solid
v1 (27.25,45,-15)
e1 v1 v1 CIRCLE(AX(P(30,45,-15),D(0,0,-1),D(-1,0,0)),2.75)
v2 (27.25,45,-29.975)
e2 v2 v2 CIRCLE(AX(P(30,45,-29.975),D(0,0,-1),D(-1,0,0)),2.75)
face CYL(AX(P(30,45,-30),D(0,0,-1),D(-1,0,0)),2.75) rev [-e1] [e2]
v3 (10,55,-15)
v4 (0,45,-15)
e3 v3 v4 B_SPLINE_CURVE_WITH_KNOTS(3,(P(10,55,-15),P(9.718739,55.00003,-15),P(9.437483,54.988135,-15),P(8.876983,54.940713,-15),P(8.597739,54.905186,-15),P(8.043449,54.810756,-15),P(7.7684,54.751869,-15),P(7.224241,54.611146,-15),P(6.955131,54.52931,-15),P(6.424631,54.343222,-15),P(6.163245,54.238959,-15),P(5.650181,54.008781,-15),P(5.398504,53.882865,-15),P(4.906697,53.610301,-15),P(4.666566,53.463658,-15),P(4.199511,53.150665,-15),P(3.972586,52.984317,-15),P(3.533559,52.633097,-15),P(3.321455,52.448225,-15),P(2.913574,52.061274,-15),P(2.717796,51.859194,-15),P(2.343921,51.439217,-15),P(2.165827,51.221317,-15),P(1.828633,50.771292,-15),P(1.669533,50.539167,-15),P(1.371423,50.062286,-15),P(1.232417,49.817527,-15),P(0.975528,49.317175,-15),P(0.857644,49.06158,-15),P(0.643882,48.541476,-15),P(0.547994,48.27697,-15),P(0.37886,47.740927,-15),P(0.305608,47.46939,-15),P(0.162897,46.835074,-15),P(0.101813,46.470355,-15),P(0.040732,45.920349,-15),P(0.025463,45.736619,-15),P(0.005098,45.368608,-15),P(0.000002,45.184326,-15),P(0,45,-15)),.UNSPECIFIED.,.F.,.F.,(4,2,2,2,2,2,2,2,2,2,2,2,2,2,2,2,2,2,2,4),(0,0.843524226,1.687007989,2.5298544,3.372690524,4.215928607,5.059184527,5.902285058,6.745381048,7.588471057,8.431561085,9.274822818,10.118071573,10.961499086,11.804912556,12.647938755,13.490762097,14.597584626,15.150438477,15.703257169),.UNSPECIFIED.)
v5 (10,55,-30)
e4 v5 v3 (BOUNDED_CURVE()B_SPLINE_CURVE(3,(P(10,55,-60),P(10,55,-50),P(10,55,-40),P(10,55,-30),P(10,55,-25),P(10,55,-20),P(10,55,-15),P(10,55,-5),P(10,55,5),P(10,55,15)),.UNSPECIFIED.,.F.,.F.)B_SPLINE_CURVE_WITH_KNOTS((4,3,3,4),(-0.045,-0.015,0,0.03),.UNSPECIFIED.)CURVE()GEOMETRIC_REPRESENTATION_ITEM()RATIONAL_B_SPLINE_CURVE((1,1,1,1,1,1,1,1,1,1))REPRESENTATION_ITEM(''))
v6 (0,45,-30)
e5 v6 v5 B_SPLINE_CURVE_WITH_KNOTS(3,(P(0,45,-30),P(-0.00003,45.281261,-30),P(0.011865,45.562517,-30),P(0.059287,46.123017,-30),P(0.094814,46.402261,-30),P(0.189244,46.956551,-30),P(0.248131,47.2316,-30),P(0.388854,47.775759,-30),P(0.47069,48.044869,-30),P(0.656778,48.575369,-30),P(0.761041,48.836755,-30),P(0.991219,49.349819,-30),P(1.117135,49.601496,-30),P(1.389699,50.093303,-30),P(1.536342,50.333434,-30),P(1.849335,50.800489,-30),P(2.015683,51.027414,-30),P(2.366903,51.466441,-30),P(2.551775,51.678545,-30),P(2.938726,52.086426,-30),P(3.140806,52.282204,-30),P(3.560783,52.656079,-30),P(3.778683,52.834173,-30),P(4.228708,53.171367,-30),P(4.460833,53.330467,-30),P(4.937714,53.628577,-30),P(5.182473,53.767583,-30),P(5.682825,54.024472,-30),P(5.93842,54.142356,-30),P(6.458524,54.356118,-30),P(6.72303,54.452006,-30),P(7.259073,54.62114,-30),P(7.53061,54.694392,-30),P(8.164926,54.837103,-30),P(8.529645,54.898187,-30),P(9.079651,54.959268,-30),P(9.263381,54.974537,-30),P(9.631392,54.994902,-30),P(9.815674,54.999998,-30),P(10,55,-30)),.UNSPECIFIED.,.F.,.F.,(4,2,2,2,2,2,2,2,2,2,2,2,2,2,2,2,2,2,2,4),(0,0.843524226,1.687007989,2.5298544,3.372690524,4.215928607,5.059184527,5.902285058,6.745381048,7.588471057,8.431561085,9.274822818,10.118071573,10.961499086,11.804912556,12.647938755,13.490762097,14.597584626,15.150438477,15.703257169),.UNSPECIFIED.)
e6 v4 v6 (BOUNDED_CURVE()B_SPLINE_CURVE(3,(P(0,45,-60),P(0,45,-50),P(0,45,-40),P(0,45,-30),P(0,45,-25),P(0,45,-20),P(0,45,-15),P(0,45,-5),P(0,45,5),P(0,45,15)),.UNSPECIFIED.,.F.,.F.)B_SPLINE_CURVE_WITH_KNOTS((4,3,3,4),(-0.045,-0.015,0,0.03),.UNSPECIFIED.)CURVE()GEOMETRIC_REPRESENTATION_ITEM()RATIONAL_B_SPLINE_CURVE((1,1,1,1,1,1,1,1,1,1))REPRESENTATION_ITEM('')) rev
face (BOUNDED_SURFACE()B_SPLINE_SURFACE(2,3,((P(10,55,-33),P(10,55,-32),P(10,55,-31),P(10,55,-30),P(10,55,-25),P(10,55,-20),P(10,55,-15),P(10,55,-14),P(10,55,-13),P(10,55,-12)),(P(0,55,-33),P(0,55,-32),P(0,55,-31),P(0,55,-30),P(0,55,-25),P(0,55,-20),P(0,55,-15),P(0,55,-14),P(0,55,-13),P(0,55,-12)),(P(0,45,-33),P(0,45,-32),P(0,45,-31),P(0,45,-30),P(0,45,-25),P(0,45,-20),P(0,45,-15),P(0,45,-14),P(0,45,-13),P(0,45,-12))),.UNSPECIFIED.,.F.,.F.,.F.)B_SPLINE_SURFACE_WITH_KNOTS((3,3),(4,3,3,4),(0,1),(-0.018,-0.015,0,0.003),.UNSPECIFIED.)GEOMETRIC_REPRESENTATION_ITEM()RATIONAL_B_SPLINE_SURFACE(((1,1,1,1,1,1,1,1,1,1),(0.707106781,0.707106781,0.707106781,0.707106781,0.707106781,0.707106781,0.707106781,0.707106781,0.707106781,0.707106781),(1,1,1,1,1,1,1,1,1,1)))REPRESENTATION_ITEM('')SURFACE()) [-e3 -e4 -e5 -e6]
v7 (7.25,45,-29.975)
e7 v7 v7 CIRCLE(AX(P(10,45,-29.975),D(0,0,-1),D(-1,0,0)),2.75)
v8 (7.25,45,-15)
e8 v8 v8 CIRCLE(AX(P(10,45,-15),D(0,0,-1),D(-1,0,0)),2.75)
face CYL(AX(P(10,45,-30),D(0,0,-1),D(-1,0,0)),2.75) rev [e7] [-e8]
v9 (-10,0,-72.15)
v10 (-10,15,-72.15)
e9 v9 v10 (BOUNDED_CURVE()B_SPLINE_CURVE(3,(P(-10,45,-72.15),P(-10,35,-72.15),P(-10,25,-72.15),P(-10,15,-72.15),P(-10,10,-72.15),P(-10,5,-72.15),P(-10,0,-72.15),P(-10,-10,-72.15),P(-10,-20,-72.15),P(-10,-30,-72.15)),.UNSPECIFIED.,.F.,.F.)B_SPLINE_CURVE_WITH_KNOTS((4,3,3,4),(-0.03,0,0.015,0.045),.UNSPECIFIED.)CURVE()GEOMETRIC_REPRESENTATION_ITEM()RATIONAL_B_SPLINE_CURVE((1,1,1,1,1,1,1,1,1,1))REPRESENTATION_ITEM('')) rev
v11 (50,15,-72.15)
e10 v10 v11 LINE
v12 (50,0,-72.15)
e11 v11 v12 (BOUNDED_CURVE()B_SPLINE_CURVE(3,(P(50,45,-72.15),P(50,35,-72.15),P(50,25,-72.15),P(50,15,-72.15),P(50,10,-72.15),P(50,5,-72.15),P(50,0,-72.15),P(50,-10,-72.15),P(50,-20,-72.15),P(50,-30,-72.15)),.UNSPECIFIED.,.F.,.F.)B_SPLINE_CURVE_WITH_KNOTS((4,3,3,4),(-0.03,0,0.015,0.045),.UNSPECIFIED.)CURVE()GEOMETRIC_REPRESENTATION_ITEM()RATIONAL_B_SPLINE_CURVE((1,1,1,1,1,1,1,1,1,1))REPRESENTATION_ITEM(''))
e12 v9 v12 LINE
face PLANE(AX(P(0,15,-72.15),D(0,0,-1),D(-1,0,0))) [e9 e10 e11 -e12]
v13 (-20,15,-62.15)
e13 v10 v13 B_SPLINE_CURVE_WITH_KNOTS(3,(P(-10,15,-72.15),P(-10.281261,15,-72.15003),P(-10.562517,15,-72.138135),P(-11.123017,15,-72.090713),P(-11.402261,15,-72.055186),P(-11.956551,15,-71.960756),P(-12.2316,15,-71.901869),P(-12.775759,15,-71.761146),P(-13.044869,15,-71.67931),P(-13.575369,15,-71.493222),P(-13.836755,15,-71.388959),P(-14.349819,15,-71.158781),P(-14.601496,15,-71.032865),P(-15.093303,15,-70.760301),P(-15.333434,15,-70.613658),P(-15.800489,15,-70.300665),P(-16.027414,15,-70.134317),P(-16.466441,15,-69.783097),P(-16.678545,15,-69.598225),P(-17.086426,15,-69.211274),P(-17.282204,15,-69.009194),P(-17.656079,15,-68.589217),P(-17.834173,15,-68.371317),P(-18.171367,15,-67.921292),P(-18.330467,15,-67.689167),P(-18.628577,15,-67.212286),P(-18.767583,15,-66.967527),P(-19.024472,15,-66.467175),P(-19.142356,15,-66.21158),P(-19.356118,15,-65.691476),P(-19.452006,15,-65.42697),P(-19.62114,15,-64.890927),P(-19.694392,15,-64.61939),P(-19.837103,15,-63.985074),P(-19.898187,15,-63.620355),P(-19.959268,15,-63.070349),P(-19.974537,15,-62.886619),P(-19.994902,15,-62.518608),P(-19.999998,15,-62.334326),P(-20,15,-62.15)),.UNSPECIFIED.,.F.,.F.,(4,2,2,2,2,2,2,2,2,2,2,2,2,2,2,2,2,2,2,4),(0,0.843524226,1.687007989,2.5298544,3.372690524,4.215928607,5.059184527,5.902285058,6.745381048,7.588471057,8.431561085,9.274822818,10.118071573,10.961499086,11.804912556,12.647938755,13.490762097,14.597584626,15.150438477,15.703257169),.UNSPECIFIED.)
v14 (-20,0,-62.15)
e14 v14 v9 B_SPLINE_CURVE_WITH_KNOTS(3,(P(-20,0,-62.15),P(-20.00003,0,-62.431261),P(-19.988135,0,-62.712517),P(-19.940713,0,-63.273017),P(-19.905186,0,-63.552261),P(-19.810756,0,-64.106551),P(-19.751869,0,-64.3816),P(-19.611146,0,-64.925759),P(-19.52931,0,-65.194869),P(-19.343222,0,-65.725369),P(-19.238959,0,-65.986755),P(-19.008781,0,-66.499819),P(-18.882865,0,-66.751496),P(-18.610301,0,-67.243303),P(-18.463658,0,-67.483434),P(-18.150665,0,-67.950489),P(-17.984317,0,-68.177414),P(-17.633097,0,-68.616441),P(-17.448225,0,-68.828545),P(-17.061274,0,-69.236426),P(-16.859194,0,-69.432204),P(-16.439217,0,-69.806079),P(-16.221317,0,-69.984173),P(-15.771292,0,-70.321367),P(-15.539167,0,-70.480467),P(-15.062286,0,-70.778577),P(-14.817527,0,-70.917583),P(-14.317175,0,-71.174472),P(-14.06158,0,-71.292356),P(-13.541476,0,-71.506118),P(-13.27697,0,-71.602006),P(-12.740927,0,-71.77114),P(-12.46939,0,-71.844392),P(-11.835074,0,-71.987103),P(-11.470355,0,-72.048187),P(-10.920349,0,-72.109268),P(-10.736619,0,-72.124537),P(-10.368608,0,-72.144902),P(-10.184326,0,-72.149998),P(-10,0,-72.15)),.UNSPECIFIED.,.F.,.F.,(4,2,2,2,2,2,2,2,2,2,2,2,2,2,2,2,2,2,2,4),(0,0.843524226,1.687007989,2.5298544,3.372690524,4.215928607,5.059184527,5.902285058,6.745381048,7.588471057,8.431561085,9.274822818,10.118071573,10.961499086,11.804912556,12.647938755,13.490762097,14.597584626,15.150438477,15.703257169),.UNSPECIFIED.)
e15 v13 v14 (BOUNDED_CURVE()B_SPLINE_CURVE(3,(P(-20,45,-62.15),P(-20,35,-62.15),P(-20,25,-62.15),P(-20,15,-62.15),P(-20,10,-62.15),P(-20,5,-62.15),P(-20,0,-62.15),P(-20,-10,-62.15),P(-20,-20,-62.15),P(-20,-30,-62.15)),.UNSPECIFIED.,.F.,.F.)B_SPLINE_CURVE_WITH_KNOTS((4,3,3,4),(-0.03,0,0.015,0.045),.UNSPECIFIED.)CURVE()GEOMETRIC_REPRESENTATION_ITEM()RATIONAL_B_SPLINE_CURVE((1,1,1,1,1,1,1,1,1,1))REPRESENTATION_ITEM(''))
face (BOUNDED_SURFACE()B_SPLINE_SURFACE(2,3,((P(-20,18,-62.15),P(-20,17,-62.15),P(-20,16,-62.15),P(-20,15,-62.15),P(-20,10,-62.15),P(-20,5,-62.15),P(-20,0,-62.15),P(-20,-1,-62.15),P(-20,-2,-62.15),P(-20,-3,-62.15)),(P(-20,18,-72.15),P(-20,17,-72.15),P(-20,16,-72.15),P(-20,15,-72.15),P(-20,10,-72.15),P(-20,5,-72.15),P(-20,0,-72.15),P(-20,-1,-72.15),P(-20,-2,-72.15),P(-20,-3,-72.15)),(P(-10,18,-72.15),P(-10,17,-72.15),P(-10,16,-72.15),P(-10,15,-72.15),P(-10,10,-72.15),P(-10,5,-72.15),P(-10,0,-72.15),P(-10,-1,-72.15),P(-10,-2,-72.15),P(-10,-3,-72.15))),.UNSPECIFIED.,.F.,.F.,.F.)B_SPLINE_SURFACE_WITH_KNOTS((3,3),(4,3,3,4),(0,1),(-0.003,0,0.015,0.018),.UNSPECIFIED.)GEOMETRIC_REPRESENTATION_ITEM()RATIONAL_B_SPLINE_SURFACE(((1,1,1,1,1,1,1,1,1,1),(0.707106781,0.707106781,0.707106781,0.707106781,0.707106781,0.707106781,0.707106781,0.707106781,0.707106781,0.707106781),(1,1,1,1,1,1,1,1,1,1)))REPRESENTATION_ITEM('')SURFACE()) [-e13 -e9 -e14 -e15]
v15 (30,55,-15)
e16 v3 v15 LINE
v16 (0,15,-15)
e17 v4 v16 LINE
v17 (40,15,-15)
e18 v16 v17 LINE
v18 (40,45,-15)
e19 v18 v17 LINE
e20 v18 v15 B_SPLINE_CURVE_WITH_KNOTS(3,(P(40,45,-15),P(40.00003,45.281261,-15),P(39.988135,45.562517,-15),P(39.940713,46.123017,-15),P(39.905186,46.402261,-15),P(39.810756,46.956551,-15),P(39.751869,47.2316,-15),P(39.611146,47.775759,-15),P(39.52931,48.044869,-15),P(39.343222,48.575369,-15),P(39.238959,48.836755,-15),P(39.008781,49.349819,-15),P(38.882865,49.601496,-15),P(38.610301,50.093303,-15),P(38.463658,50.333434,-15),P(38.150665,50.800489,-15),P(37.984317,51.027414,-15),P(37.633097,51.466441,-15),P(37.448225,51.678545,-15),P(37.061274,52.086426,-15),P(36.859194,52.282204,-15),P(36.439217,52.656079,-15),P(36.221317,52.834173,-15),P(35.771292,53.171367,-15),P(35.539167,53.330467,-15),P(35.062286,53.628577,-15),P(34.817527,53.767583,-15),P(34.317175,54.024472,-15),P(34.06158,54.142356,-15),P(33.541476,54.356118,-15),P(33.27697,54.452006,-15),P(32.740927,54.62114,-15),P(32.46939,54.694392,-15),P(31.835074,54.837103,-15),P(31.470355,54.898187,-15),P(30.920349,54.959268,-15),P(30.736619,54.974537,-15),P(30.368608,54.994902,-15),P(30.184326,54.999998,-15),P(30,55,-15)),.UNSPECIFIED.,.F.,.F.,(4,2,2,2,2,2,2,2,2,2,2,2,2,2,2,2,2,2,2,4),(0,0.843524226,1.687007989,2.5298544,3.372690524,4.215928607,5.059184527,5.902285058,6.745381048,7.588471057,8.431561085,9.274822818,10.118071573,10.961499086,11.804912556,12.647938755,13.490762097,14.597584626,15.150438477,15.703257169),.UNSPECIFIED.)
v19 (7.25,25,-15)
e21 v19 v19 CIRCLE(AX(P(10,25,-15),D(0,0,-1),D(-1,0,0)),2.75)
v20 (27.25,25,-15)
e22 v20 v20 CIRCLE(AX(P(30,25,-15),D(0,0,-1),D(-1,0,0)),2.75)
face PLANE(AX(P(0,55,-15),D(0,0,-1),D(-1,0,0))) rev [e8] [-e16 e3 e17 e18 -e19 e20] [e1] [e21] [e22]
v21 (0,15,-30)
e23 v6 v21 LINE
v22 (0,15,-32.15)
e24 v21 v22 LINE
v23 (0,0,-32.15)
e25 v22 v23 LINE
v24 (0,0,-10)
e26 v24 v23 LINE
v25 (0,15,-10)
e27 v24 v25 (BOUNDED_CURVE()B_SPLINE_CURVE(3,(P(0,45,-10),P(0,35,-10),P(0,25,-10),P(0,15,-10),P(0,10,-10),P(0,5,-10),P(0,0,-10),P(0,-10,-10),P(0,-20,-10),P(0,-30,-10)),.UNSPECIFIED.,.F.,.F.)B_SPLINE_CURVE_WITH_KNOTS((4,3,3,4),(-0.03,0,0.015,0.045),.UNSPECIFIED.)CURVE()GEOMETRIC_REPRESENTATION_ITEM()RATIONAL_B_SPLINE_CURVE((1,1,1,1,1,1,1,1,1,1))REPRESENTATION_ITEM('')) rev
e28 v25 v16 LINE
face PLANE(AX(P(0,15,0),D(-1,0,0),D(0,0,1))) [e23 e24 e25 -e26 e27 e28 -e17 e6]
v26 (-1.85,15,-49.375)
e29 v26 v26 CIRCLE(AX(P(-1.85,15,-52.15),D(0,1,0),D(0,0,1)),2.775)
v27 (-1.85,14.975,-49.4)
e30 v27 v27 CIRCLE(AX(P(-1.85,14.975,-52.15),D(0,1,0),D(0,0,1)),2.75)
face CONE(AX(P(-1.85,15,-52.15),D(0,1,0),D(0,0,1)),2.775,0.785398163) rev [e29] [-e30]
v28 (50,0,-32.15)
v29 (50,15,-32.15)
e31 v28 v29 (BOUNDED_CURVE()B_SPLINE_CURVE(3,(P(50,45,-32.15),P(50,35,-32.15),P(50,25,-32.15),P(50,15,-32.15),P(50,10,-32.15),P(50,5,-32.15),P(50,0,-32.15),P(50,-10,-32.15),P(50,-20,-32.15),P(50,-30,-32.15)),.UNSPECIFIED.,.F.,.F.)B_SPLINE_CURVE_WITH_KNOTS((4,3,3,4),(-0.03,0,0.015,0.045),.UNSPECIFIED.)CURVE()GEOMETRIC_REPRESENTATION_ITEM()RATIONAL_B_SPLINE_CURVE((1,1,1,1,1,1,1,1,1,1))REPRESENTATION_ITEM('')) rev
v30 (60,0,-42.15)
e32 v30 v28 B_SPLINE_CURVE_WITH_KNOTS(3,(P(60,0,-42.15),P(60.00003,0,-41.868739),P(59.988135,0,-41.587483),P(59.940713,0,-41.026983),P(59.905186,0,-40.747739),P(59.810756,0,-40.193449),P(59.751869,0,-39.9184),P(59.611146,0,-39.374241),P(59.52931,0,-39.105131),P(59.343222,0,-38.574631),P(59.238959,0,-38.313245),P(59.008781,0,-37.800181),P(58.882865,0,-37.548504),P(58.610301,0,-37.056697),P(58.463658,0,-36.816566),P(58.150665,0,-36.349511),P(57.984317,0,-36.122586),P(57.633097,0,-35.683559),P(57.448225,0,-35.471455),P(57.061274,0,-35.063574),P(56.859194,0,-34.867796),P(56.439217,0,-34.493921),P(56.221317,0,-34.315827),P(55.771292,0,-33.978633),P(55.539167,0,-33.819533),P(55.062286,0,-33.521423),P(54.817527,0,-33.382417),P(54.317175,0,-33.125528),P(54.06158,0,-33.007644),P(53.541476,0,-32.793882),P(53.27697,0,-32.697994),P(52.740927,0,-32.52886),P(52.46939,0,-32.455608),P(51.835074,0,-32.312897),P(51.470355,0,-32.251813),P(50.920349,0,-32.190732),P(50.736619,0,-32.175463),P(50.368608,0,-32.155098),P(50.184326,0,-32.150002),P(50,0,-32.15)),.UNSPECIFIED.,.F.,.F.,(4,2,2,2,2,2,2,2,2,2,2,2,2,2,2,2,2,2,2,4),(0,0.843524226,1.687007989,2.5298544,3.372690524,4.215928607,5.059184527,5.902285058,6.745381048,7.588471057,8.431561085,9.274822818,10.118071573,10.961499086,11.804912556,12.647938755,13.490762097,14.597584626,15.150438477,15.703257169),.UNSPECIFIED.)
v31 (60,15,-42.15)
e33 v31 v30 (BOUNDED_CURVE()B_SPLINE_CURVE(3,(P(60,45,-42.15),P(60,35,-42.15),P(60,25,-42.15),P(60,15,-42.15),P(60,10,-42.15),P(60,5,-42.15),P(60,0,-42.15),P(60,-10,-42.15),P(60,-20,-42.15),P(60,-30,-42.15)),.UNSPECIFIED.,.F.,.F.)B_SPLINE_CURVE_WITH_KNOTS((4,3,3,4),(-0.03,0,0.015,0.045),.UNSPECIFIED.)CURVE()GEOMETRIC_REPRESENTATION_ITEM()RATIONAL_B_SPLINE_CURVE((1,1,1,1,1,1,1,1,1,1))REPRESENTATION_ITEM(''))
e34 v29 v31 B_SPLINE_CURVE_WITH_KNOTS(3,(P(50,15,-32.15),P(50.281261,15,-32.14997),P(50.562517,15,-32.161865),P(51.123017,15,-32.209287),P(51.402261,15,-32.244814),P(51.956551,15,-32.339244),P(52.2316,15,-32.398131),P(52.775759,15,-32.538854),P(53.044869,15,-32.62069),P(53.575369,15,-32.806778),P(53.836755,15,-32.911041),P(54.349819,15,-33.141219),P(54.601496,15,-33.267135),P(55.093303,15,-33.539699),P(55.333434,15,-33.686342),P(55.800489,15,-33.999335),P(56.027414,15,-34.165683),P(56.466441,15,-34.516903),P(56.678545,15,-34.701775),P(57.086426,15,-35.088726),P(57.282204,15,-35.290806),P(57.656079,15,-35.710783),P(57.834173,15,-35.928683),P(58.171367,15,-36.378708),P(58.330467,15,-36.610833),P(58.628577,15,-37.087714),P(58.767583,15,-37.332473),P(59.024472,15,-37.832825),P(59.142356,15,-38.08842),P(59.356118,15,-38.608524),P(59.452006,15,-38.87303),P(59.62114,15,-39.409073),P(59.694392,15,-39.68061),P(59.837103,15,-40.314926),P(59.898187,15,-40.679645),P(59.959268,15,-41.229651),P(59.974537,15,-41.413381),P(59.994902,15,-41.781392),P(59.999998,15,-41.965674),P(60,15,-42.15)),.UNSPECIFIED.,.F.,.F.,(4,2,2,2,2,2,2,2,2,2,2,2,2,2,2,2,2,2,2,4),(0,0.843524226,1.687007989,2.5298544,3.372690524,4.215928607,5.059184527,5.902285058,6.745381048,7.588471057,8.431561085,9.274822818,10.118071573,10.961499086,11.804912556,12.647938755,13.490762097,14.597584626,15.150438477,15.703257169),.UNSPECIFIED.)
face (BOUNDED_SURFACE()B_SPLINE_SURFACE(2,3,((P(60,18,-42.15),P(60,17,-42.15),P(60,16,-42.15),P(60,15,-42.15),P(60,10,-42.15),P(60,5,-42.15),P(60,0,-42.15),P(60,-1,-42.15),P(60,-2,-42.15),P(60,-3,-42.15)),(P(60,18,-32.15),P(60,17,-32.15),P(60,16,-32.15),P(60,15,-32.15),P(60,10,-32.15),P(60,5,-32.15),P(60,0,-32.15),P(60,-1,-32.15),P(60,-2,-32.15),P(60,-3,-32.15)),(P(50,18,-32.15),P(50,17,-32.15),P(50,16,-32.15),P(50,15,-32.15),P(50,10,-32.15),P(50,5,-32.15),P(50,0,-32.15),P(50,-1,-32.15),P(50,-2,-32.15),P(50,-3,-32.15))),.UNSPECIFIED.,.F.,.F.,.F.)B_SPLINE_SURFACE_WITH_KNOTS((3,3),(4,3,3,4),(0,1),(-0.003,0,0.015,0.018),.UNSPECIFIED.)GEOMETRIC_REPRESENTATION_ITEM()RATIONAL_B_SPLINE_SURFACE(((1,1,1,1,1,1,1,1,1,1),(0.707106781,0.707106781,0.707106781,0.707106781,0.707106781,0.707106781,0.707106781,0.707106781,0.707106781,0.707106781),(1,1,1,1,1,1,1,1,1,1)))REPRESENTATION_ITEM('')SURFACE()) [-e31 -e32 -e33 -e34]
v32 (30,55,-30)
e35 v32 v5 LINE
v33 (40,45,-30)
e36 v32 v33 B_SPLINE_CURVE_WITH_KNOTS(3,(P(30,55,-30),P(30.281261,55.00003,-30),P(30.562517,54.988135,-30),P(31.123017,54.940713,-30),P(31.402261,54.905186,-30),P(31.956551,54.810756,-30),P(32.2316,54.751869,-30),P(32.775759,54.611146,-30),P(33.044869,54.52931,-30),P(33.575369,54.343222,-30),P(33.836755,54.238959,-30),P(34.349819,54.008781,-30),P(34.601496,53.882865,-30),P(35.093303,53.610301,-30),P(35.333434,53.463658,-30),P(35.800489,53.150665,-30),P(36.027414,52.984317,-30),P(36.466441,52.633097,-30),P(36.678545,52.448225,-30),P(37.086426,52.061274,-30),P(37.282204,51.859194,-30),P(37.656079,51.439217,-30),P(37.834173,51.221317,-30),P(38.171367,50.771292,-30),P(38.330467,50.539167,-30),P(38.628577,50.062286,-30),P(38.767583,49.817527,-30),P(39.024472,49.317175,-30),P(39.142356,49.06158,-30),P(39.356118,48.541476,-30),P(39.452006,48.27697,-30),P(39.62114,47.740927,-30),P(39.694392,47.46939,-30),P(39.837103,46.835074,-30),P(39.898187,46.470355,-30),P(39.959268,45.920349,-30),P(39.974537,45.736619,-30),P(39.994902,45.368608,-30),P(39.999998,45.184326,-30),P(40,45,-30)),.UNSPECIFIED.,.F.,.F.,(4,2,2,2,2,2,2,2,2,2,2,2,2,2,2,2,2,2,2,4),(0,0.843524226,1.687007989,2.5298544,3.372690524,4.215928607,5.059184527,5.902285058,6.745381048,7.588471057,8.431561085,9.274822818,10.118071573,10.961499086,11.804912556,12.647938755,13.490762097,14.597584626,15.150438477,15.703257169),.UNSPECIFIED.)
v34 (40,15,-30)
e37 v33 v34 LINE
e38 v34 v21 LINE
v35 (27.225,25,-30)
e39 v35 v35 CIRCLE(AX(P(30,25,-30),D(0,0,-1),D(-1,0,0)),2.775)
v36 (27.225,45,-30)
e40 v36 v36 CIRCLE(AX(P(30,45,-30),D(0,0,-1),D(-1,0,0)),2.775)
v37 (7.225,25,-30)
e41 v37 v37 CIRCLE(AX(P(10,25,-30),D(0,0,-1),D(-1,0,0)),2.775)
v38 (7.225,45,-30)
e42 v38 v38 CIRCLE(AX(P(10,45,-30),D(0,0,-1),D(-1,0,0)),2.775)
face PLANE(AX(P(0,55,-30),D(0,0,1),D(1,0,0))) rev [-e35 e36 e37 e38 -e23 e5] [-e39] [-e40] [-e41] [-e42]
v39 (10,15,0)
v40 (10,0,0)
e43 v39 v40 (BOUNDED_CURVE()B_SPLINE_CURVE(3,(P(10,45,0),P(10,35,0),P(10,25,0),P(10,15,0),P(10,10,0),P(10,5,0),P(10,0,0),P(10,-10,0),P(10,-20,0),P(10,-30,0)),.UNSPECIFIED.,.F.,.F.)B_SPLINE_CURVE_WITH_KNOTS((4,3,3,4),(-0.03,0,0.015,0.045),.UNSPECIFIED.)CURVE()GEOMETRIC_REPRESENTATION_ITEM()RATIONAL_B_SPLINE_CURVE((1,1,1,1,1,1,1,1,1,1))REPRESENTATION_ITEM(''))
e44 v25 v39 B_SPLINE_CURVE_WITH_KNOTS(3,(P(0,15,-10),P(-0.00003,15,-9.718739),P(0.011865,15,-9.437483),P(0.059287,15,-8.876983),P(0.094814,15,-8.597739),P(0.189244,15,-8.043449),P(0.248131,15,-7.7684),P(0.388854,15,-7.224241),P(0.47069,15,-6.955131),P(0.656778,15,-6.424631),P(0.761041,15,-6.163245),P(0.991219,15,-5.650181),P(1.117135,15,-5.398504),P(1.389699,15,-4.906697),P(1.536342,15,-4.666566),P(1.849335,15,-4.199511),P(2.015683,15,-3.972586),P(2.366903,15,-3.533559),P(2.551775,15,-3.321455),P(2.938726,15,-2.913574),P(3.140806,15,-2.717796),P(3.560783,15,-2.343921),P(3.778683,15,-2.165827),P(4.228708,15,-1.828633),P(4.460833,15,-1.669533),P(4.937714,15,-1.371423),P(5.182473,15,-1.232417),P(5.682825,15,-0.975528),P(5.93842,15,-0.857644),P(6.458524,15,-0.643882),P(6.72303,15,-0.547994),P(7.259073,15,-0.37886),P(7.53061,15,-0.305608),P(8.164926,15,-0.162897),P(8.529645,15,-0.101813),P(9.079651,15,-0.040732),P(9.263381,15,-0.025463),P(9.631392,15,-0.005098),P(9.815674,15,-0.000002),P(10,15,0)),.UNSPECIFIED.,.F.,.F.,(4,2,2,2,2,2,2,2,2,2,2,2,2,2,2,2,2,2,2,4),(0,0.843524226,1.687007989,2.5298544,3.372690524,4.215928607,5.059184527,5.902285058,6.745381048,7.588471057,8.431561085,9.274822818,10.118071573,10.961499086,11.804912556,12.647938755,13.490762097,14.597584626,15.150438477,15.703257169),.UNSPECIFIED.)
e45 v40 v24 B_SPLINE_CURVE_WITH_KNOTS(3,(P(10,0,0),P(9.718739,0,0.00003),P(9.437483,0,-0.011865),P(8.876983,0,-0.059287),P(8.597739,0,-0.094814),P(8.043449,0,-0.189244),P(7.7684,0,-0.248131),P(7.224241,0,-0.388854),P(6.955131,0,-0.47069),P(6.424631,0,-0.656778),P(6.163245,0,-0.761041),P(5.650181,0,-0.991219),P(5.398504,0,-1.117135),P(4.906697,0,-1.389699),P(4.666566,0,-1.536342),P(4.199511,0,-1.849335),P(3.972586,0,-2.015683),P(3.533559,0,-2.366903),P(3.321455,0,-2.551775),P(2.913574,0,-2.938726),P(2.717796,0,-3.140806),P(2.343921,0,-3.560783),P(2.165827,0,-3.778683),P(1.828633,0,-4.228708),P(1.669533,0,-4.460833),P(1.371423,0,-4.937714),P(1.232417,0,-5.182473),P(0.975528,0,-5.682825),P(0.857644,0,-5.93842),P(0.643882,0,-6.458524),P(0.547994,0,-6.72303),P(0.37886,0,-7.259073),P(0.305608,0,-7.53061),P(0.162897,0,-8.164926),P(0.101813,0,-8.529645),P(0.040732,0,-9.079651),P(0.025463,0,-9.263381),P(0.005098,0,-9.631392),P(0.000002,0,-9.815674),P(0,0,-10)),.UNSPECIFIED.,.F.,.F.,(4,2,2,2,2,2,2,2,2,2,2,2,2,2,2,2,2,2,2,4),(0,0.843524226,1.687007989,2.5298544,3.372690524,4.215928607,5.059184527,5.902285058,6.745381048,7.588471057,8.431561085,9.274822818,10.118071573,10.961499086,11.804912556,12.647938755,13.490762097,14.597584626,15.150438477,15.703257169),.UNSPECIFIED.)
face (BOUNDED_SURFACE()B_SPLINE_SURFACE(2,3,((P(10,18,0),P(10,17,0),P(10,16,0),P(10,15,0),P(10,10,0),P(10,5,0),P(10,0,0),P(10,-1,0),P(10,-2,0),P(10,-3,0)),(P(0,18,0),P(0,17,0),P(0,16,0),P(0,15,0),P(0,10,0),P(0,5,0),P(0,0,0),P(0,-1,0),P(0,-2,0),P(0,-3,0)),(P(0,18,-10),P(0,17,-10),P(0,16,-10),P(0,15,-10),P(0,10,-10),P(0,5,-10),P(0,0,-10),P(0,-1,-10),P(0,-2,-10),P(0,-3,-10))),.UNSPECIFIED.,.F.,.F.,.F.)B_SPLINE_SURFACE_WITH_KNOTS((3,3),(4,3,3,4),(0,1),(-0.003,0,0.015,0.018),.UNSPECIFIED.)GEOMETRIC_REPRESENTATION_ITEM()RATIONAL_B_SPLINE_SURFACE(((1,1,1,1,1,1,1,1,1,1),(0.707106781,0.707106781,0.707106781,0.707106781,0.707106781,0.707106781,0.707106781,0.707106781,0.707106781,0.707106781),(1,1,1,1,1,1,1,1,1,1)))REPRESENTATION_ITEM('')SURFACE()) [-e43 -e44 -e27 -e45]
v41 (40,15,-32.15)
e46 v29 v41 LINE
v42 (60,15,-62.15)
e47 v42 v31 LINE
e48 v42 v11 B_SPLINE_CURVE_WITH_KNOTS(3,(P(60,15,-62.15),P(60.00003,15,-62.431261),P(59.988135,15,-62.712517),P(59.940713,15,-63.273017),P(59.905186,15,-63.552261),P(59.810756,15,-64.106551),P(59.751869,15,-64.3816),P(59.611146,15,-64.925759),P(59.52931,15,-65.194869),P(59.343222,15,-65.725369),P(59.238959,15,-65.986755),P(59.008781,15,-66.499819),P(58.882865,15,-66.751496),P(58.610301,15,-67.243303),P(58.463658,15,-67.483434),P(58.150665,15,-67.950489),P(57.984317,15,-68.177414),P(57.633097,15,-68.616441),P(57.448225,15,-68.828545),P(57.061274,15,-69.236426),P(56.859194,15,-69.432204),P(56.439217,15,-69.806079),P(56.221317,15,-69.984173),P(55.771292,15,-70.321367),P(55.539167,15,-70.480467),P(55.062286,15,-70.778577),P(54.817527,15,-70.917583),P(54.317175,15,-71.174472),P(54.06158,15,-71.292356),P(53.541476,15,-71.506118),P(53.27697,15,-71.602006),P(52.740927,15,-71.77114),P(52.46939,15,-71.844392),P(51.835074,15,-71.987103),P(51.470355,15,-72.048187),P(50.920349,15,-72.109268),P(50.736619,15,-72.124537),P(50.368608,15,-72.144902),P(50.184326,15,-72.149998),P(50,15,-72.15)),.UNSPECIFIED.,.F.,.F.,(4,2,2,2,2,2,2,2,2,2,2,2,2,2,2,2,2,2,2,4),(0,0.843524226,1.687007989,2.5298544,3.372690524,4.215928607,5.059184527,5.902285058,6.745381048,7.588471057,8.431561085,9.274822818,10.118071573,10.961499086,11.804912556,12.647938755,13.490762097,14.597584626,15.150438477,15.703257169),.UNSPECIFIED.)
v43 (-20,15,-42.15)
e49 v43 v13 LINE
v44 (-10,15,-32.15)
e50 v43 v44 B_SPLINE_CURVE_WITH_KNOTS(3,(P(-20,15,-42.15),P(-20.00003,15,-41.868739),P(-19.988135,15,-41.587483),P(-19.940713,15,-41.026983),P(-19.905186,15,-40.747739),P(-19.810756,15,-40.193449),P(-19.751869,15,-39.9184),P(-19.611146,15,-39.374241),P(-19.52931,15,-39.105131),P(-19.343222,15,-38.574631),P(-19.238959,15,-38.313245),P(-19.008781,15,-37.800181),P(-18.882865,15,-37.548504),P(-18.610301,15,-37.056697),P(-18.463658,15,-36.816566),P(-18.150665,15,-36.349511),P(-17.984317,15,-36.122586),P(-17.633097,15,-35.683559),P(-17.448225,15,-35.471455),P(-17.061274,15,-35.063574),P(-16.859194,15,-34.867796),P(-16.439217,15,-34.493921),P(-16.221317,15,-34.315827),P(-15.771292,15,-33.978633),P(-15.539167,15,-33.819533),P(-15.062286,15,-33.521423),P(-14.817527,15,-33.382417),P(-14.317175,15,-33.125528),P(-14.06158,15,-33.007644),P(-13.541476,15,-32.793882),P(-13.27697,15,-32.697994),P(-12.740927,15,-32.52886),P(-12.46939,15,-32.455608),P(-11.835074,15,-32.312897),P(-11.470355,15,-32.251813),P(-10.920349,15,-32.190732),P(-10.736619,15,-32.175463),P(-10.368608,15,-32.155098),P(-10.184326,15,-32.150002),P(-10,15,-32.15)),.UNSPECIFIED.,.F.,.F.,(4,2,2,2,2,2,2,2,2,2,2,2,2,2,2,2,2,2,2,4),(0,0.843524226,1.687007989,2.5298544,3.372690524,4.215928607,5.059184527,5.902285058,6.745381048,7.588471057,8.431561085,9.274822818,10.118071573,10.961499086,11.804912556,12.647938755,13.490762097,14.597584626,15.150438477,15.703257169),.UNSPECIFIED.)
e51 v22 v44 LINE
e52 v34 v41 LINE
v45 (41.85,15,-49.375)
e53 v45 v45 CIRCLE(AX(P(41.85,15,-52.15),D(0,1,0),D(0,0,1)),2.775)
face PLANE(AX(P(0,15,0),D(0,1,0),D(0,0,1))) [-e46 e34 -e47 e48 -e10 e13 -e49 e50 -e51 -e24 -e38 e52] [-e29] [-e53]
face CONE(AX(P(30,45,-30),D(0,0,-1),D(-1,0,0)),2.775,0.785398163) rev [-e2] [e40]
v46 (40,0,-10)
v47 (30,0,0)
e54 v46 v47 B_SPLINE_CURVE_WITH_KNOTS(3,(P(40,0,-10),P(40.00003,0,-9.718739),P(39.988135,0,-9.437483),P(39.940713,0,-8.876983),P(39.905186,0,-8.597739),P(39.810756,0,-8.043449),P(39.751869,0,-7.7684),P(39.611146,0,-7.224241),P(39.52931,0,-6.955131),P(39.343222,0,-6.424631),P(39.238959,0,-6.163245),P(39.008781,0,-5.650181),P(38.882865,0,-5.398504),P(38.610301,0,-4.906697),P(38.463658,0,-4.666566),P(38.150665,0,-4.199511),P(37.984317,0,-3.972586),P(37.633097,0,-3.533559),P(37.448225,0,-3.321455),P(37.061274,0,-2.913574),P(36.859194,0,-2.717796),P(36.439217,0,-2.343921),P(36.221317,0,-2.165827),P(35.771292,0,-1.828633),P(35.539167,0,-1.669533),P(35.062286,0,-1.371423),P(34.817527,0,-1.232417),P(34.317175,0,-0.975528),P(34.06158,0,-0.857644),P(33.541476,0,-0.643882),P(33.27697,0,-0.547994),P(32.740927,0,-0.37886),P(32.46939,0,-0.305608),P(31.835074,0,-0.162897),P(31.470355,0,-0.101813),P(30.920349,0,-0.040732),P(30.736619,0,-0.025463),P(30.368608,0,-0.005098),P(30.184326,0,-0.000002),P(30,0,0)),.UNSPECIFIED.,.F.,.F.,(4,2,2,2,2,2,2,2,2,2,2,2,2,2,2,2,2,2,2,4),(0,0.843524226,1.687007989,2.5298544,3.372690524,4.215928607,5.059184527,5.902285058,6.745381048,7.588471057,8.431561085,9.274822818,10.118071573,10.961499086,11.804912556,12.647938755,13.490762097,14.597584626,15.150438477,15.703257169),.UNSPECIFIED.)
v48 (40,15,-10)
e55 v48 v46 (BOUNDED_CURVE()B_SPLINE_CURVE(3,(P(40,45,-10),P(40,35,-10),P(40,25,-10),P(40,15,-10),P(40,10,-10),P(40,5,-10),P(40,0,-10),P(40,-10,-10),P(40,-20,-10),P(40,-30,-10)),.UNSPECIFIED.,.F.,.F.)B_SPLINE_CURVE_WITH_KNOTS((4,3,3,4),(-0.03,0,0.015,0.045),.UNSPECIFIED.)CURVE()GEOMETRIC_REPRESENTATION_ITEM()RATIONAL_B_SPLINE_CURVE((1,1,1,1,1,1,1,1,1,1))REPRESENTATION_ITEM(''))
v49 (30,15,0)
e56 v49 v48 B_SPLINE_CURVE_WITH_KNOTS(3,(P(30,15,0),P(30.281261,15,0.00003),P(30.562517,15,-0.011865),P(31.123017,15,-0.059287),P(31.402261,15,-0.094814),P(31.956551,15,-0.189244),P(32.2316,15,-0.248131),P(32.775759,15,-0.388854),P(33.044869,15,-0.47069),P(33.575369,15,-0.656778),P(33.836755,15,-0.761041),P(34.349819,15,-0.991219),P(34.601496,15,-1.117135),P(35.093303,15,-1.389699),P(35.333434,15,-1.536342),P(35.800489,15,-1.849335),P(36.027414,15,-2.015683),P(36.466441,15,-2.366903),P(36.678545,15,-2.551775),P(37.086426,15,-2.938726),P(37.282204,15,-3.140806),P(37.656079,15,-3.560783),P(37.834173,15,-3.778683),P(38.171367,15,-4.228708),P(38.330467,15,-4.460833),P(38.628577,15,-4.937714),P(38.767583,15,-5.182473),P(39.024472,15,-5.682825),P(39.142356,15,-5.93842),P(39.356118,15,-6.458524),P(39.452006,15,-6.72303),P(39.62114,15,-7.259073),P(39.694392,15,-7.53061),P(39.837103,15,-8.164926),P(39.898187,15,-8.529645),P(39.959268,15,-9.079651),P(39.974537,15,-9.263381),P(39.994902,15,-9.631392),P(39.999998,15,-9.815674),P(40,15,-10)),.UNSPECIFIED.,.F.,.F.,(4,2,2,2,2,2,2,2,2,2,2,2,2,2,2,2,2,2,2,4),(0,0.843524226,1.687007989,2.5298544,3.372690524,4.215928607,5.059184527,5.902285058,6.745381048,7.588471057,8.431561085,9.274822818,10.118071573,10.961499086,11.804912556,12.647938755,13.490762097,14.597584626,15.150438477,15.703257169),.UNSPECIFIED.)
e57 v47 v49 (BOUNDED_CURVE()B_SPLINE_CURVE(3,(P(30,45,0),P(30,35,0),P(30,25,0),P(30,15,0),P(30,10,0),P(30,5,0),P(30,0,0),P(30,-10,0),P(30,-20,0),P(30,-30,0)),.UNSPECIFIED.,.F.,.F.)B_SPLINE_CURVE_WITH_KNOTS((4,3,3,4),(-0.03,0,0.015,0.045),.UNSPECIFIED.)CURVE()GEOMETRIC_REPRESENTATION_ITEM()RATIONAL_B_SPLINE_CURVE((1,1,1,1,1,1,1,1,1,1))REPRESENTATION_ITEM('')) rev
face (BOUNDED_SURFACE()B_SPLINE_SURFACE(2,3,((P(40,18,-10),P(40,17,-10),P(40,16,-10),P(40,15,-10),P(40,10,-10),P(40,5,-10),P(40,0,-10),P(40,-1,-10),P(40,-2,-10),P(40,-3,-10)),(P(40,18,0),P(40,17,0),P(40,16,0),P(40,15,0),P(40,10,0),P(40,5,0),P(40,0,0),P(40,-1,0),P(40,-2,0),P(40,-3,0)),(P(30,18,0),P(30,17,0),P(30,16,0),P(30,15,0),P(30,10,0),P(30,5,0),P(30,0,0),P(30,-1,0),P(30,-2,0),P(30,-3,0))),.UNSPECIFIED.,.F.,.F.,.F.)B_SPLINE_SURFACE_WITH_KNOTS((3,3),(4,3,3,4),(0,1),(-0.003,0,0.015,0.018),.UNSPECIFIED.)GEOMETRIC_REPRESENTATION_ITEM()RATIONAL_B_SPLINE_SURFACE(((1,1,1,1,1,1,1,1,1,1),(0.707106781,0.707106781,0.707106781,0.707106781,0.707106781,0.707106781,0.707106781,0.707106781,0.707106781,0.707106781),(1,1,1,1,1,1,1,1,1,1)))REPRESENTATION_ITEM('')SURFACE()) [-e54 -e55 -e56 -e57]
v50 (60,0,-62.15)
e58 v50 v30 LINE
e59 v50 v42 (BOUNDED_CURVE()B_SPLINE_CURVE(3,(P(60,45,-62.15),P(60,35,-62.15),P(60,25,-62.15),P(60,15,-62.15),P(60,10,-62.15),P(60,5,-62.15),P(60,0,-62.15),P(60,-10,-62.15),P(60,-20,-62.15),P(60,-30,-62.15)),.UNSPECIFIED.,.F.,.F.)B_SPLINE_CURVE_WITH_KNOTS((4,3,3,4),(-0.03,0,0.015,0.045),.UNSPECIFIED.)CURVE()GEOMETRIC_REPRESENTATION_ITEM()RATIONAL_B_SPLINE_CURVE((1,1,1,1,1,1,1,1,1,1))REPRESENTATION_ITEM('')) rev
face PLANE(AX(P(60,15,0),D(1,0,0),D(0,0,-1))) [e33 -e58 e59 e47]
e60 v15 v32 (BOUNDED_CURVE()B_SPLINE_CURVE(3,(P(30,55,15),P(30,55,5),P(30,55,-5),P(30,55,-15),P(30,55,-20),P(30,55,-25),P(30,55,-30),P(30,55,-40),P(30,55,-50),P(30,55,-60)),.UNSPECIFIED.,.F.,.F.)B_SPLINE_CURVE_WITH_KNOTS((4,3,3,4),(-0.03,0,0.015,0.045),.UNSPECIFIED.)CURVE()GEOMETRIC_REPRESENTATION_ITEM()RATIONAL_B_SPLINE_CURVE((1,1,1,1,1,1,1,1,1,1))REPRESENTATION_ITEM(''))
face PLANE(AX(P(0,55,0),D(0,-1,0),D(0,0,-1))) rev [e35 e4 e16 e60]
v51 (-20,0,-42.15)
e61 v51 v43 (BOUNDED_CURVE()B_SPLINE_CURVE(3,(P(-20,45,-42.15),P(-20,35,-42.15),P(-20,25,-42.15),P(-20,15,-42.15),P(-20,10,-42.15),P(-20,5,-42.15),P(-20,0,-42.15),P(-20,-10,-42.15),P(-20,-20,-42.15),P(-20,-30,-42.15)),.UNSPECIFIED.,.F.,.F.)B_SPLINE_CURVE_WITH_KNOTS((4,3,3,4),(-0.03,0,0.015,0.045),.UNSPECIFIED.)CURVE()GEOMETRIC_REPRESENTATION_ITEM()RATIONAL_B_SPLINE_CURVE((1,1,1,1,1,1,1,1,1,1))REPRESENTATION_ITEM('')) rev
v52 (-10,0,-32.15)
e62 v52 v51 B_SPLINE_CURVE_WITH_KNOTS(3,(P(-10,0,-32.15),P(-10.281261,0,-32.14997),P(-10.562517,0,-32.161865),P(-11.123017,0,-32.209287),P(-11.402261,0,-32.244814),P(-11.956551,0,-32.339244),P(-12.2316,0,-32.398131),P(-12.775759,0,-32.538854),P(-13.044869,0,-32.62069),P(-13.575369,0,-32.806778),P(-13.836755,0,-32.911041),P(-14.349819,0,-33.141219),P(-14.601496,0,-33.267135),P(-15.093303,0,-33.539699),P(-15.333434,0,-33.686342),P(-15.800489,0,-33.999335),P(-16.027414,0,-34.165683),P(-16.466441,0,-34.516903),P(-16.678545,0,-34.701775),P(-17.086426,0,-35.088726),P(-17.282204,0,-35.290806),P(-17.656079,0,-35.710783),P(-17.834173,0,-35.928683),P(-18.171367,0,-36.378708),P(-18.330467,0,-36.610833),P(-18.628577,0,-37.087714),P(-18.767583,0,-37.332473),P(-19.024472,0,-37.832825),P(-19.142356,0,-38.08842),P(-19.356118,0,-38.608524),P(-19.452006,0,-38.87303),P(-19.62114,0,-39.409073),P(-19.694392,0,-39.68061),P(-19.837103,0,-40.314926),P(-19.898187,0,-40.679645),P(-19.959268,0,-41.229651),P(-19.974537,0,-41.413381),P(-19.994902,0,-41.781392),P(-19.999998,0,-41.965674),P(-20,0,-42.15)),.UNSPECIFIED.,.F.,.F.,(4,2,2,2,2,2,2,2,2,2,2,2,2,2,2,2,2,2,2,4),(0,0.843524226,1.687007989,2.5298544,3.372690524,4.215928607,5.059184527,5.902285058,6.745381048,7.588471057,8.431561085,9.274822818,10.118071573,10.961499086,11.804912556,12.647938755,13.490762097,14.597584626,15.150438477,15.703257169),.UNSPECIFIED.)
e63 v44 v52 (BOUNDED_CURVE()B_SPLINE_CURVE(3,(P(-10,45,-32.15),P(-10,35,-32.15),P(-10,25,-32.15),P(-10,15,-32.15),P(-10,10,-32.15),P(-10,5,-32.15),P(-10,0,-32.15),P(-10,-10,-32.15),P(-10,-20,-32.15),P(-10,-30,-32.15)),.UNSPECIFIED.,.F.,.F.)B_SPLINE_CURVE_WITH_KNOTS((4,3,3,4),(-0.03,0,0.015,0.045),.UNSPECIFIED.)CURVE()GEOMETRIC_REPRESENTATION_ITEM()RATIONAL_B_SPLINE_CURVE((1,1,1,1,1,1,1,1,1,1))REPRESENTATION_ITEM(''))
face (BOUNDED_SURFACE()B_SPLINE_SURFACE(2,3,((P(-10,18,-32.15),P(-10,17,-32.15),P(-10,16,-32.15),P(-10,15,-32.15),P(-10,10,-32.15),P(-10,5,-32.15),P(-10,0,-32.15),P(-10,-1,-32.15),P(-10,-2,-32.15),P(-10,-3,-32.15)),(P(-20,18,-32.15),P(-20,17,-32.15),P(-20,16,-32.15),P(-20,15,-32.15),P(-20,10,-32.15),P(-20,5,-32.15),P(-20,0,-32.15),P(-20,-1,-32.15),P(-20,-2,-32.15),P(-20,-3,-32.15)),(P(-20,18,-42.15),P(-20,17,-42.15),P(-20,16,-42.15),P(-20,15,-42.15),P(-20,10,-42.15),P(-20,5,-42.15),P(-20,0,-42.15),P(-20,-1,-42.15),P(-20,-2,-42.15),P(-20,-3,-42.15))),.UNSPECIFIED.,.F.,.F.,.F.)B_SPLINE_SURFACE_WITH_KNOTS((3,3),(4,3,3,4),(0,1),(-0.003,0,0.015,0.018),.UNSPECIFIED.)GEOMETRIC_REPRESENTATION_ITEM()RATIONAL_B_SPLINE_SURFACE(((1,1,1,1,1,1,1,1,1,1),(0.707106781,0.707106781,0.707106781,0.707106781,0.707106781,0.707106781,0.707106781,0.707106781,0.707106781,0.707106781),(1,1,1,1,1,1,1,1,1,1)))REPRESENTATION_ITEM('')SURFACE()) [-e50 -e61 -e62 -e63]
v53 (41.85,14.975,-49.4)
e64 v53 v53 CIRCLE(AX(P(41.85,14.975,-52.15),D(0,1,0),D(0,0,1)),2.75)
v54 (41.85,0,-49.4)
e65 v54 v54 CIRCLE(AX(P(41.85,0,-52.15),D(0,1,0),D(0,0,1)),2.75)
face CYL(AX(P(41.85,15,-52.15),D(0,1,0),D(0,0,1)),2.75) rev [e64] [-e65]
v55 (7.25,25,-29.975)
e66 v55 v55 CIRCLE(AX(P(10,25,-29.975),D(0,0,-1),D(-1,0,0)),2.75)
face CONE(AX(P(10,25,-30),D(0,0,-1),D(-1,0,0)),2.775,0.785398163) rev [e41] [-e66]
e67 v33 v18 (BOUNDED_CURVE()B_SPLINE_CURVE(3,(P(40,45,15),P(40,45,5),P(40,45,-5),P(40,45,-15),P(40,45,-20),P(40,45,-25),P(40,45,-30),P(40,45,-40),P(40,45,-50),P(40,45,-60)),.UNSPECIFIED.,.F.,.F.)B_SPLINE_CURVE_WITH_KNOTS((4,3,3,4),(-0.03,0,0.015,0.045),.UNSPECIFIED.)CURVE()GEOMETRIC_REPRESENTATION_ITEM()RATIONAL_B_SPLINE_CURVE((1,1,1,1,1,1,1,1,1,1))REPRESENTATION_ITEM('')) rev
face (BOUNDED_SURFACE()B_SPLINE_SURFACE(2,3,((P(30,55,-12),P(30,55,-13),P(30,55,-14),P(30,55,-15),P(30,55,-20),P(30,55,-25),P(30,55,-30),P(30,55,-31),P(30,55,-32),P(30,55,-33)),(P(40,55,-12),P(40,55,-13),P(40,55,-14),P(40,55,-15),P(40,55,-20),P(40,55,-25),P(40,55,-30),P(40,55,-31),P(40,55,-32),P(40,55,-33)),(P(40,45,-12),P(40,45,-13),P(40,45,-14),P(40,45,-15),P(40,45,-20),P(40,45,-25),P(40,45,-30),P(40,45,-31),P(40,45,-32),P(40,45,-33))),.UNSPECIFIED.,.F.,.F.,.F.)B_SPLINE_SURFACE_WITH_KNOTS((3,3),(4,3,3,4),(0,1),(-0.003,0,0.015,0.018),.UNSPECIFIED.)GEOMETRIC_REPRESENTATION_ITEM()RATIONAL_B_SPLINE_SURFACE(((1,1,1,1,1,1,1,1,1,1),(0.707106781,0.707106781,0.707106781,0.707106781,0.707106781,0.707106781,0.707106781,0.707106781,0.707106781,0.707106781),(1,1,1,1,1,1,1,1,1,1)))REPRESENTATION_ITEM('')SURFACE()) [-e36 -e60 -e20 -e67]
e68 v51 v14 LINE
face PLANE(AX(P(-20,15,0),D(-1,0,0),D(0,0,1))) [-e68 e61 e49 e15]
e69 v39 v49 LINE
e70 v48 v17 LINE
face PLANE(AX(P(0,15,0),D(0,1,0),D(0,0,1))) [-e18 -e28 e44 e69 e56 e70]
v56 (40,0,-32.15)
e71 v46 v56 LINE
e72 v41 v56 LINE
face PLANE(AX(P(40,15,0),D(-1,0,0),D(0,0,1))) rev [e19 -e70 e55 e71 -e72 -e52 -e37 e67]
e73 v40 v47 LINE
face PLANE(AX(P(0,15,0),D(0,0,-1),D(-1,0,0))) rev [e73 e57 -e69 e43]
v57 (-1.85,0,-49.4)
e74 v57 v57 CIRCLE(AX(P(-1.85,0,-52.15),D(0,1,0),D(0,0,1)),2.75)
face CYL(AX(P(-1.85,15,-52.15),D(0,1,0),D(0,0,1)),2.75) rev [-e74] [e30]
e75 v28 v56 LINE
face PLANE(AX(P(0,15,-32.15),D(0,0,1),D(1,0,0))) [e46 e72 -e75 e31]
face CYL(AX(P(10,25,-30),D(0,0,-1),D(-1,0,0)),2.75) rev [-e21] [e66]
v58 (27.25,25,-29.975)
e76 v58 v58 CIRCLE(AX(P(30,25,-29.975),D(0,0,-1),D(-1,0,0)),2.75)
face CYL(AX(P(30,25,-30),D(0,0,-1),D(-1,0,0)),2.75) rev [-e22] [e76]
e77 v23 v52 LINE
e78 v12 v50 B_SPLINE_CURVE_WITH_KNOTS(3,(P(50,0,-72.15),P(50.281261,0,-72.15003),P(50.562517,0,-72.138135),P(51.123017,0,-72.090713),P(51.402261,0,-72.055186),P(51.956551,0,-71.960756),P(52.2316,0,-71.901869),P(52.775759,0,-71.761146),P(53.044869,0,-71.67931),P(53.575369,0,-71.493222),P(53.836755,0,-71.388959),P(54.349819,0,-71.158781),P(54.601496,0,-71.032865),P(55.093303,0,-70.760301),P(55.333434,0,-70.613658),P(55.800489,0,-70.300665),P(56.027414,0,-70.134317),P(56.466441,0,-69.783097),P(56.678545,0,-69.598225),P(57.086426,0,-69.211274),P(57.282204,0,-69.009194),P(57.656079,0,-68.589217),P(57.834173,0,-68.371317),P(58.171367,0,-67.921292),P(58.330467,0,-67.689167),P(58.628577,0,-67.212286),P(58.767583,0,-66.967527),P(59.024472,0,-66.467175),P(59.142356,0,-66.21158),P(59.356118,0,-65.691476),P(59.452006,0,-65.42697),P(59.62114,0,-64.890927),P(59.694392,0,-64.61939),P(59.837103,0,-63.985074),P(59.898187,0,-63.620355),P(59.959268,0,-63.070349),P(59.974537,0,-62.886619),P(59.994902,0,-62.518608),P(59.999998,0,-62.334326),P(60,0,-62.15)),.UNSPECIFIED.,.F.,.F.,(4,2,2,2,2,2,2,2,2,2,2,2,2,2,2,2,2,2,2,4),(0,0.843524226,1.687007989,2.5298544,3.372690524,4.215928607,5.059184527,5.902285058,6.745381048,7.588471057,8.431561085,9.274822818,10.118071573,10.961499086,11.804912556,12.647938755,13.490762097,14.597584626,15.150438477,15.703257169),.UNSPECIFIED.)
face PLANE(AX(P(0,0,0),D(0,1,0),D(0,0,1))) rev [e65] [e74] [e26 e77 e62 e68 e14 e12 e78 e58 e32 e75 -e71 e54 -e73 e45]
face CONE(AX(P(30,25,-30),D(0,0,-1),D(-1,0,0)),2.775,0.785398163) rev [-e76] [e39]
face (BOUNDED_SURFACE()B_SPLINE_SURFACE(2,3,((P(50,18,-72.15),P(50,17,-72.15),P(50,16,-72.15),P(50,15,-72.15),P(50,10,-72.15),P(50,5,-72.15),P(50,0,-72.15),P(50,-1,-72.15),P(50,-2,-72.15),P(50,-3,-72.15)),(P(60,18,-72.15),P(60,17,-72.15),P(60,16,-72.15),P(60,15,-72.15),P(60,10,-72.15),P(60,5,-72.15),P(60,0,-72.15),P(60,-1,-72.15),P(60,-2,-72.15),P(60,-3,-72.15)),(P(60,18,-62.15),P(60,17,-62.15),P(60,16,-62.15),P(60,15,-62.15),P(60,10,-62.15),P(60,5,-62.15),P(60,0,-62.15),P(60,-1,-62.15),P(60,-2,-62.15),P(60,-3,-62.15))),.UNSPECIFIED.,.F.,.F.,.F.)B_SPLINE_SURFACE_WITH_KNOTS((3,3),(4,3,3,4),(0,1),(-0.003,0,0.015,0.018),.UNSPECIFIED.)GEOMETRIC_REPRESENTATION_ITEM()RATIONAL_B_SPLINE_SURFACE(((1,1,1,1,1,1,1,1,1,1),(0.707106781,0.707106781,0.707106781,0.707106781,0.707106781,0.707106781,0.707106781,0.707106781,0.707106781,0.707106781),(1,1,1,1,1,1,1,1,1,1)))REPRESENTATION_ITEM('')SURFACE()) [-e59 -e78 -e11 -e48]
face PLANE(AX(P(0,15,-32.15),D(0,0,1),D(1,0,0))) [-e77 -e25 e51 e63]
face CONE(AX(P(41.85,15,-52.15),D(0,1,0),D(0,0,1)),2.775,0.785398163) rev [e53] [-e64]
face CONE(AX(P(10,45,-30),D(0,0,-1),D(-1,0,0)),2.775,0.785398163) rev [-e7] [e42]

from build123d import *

# Parameters (mm, degrees)
BOSS_EXTRUDE1_DEPTH            = 15
M5_CLEARANCE_HOLE1_D           = 5.5
M5_CLEARANCE_HOLE1_CSINK_D     = 5.55
M5_CLEARANCE_HOLE1_CSINK_ANGLE = 90
SKETCH8_W                      = 40
SKETCH8_H                      = 15
BOSS_EXTRUDE2_DEPTH            = 40
M5_CLEARANCE_HOLE2_D           = 5.5
M5_CLEARANCE_HOLE2_CSINK_D     = 5.55
M5_CLEARANCE_HOLE2_CSINK_ANGLE = 90
FILLET2_R                      = 10


with BuildPart() as part:
    # Sketch1 → Boss-Extrude1 (new body)
    with BuildSketch(Plane(origin=(0, 0, 0), x_dir=(1, 0, 0), z_dir=(0, 1, 0))):
        Polygon((0, 32.15), (0, 0), (40, 0), (40, 32.15), (60, 32.15), (60, 72.15), (-20, 72.15), (-20, 32.15), align=None)
    extrude(amount=BOSS_EXTRUDE1_DEPTH)

    # M5 Clearance Hole1 (through all)
    with Locations(Plane(origin=(0, 15, 0), x_dir=(1, 0, 0), z_dir=(0, 1, 0))):
        with Locations((-1.85, 52.15), (41.85, 52.15)):
            CounterSinkHole(M5_CLEARANCE_HOLE1_D / 2, M5_CLEARANCE_HOLE1_CSINK_D / 2, counter_sink_angle=M5_CLEARANCE_HOLE1_CSINK_ANGLE)

    # Sketch8 → Boss-Extrude2 (add)
    with BuildSketch(Plane(origin=(0, 15, 0), x_dir=(1, 0, 0), z_dir=(0, 1, 0))):
        with Locations((20, 22.5)):
            Rectangle(SKETCH8_W, SKETCH8_H)
    extrude(amount=BOSS_EXTRUDE2_DEPTH)

    # M5 Clearance Hole2 (through all)
    with Locations(Plane(origin=(0, 0, -30), x_dir=(-1, 0, 0), z_dir=(0, 0, -1))):
        with Locations((-10, 25), (-30, 45), (-30, 25), (-10, 45)):
            CounterSinkHole(M5_CLEARANCE_HOLE2_D / 2, M5_CLEARANCE_HOLE2_CSINK_D / 2, counter_sink_angle=M5_CLEARANCE_HOLE2_CSINK_ANGLE)

    # Fillet2
    fillet2_edges = [part.edges().sort_by_distance(p)[0] for p in [
        (40, 55, -22.5),
        (0, 55, -22.5),
        (-20, 7.5, -32.15),
        (0, 7.5, 0),
        (40, 7.5, 0),
        (60, 7.5, -32.15),
        (60, 7.5, -72.15),
        (-20, 7.5, -72.15),
    ]]
    fillet(fillet2_edges, radius=FILLET2_R)


solid = part.part
